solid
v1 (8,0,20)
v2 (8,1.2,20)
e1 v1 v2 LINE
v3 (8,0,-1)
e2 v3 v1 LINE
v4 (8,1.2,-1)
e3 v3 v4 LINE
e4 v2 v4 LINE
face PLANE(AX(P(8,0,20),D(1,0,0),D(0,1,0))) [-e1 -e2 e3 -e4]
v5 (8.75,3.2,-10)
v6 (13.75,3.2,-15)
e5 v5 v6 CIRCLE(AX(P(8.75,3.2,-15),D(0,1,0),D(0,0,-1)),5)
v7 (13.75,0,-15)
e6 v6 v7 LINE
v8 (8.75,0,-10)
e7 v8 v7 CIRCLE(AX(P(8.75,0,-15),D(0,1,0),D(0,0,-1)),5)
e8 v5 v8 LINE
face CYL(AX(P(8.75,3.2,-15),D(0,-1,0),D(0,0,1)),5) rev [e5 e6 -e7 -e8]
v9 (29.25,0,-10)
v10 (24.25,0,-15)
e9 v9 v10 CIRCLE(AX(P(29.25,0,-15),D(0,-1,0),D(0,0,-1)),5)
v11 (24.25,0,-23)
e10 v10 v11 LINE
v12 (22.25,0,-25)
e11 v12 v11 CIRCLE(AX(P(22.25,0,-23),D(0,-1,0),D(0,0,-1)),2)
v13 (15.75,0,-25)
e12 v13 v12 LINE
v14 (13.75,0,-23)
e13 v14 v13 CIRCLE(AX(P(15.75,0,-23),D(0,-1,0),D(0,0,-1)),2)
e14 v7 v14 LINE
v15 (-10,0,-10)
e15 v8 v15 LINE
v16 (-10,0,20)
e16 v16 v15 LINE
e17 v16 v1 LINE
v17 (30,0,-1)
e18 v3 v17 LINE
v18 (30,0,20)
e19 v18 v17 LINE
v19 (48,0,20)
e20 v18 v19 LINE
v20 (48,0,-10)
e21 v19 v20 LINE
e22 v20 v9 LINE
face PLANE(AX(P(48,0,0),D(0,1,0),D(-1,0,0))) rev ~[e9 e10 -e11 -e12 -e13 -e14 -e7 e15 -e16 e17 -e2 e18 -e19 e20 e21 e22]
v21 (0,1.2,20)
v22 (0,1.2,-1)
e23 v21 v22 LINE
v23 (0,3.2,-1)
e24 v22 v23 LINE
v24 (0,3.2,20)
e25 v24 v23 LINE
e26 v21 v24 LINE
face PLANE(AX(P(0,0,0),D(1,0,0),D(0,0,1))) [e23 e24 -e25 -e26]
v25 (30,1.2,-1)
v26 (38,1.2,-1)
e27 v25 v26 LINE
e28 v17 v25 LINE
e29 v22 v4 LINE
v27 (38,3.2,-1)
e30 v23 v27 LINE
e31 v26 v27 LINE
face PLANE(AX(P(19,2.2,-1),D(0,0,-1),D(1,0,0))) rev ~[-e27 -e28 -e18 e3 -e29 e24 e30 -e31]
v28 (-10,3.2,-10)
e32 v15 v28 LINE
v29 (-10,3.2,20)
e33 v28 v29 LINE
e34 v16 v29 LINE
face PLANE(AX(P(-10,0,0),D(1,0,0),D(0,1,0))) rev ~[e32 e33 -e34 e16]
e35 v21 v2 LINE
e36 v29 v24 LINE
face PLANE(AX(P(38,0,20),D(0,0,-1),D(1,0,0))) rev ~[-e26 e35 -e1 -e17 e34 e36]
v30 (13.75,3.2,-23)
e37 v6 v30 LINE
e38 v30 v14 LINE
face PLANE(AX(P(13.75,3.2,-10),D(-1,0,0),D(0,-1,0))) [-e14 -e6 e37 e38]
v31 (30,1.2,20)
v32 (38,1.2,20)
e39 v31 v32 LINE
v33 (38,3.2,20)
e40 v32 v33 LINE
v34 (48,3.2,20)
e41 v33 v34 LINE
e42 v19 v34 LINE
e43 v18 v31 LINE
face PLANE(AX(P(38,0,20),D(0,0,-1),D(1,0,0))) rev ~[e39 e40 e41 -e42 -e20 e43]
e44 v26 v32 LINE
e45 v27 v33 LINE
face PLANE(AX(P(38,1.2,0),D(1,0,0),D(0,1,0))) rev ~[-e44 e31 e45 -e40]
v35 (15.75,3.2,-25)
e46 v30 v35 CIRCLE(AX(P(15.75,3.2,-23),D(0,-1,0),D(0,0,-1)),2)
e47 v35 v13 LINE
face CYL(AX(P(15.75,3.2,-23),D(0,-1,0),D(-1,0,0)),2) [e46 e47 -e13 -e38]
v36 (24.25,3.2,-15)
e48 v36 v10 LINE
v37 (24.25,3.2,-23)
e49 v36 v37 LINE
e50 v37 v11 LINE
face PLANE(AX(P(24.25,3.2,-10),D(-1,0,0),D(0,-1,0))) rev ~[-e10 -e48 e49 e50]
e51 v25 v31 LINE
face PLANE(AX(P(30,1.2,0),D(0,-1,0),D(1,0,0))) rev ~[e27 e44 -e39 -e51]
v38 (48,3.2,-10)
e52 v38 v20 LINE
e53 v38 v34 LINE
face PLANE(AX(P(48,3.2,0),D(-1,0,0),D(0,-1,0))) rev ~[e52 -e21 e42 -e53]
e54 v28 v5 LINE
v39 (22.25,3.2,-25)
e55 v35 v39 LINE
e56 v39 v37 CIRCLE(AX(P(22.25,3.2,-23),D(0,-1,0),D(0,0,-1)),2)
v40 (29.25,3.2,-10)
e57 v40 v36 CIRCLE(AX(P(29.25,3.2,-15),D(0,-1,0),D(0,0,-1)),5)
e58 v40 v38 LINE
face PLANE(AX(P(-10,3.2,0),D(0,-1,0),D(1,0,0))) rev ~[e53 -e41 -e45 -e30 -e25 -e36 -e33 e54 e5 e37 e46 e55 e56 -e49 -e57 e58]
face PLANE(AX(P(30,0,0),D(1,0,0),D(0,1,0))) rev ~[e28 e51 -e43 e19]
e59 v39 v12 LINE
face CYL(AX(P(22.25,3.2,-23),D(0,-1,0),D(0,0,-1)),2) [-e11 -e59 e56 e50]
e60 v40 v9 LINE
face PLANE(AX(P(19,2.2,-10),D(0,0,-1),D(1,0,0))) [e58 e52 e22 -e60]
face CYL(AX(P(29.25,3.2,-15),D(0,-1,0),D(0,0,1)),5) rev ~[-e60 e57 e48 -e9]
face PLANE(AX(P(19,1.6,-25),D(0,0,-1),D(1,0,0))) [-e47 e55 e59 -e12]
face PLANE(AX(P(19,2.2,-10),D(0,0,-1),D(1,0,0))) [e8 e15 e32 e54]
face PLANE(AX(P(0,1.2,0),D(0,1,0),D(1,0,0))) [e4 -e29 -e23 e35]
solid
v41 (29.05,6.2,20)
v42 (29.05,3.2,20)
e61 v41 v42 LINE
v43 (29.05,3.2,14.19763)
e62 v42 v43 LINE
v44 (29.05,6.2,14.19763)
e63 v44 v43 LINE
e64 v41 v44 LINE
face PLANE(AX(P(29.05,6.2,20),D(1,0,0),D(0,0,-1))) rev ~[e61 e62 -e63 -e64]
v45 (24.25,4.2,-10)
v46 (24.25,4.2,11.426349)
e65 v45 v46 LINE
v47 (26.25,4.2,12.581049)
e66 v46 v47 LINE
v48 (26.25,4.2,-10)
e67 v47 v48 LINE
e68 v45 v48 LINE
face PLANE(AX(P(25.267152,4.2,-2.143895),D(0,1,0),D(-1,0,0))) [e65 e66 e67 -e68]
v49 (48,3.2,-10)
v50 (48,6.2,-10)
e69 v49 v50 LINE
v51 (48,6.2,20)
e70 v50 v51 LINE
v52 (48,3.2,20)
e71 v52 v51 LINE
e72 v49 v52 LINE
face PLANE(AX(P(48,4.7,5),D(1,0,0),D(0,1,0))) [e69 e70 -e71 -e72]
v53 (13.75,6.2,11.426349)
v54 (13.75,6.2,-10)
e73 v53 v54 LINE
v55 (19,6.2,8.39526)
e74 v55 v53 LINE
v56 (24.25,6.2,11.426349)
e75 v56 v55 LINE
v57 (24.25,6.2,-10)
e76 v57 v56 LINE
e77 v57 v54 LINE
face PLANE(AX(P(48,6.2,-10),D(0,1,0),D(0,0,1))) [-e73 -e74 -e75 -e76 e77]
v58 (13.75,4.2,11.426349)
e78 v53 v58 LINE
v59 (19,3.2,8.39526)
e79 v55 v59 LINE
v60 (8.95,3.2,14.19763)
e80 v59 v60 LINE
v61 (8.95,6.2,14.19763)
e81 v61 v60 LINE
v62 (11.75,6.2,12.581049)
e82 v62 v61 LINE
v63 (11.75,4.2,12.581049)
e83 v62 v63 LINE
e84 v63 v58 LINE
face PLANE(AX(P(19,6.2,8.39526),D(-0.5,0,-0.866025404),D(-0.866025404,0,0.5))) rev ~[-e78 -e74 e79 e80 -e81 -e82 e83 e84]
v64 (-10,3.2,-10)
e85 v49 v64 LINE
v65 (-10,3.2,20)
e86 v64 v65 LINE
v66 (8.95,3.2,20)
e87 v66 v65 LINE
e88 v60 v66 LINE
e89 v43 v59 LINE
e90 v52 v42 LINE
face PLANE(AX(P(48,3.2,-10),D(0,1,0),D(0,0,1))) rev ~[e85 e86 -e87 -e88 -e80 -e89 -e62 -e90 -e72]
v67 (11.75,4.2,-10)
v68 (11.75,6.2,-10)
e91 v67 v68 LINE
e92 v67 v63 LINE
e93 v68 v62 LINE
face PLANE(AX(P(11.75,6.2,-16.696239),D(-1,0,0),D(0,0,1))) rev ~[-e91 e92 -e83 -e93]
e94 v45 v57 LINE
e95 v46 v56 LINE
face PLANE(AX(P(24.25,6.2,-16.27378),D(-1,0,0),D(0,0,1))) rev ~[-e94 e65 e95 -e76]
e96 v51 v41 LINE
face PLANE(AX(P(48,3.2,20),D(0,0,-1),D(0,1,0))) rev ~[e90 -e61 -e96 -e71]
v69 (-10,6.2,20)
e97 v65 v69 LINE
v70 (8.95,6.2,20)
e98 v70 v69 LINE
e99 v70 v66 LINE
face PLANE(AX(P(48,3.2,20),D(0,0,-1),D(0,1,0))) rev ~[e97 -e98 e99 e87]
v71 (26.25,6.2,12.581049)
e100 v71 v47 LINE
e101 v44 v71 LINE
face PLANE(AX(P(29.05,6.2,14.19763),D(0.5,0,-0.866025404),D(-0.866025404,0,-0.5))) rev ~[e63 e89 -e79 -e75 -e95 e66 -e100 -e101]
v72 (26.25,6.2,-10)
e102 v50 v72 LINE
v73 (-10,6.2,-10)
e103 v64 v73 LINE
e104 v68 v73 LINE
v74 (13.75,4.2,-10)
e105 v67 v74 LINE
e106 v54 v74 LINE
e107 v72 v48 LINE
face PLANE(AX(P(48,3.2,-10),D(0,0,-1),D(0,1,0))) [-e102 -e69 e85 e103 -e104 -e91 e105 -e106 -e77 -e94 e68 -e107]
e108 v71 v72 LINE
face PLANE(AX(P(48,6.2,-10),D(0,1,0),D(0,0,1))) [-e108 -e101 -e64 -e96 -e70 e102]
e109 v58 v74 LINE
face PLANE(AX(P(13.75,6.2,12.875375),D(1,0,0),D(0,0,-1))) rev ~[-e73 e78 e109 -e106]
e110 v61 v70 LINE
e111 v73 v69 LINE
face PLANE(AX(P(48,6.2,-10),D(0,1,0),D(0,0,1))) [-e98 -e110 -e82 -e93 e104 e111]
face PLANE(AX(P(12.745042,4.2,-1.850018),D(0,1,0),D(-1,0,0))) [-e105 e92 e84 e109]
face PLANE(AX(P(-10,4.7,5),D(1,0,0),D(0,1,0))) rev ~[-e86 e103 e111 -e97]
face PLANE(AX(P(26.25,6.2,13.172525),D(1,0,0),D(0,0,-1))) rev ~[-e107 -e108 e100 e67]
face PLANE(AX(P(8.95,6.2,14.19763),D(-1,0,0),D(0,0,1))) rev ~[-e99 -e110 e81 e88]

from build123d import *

# Parameters (mm, degrees)
F0_W      = 38
F0_H      = 1.2
F1_DEPTH  = 20
F3_W      = 10
F3_H      = 20
F4_DEPTH  = 3.2
F5_W      = 10
F5_H      = 20
F6_DEPTH  = 3.2
F7_W      = 38
F7_H      = 2
F8_DEPTH  = 10
F2_W      = 22
F2_H      = 1.2
F9_DEPTH  = 20
F10_W     = 3
F10_H     = 30
F11_DEPTH = 58
F13_DEPTH = 6.201
F15_DEPTH = 2
F16_W     = 10.5
F16_H     = 3.2
F17_DEPTH = 15
F18_R     = 5
F19_R     = 2
F20_DEPTH = 1


with BuildPart() as f1:
    # F0 (on Top) → F1 (new body)
    with BuildSketch(Plane.XY):
        with Locations((19, 0.6)):
            Rectangle(F0_W, F0_H)
    extrude(amount=F1_DEPTH)

    # F3 (on face) → F4 (join)
    with BuildSketch(Plane.XZ):
        with Locations((-5, 10)):
            Rectangle(F3_W, F3_H)
    extrude(amount=-F4_DEPTH)

    # F5 (on face) → F6 (join)
    with BuildSketch(Plane.XZ):
        with Locations((43, 10)):
            Rectangle(F5_W, F5_H)
    extrude(amount=-F6_DEPTH)

    # F7 (on face) → F8 (join)
    with BuildSketch(Plane(origin=(0, 0, 0), x_dir=(1, 0, 0), z_dir=(0, 0, -1))):
        with Locations((19, -2.2)):
            Rectangle(F7_W, F7_H)
        Polygon((48, -3.2), (48, 0), (-10, 0), (-10, -3.2), (0, -3.2), (0, -1.2), (38, -1.2), (38, -3.2), align=None)
    extrude(amount=F8_DEPTH)

    # F2 (on face) → F9 (cut)
    with BuildSketch(Plane.XY.offset(20)):
        with Locations((19, 0.6)):
            Rectangle(F2_W, F2_H)
    extrude(amount=-F9_DEPTH, mode=Mode.SUBTRACT)

    # F16 (on face) → F17 (join)
    with BuildSketch(Plane(origin=(0, 0, -10), x_dir=(1, 0, 0), z_dir=(0, 0, -1))):
        with Locations((19, -1.6)):
            Rectangle(F16_W, F16_H)
    extrude(amount=F17_DEPTH)

    # F18
    f18_edges = [f1.edges().sort_by_distance(p)[0] for p in [
        (24.25, 1.6, -10),
        (13.75, 1.6, -10),
    ]]
    fillet(f18_edges, radius=F18_R)

    # F19
    f19_edges = [f1.edges().sort_by_distance(p)[0] for p in [
        (24.25, 1.6, -25),
        (13.75, 1.6, -25),
    ]]
    fillet(f19_edges, radius=F19_R)

    # F20 (cut): a face of the model
    f20_faces = [f1.faces().sort_by_distance(p)[0] for p in [
        (19, 1.7875, 0),
    ]]
    extrude(f20_faces, amount=-F20_DEPTH, mode=Mode.SUBTRACT)


with BuildPart() as f11:
    # F10 (on face) → F11 (new body)
    with BuildSketch(Plane.YZ.offset(48)):
        with Locations((4.7, 5)):
            Rectangle(F10_W, F10_H)
    extrude(amount=-F11_DEPTH)

    # F12 (on face) → F13 (cut, through all)
    with BuildSketch(Plane(origin=(0, 6.2, 0), x_dir=(-1, 0, 0), z_dir=(0, 1, 0))):
        Polygon((-29.05, 20), (-29.05, 14.1976297946), (-19, 8.3952595893), (-8.95, 14.1976297946), (-8.95, 20), align=None)
    extrude(amount=-F13_DEPTH, mode=Mode.SUBTRACT)

    # F14 (on face) → F15 (cut)
    with BuildSketch(Plane(origin=(0, 6.2, 0), x_dir=(-1, 0, 0), z_dir=(0, 1, 0))):
        Polygon((-24.25, 11.1954083949), (-26.25, 12.3501089332), (-26.25, -16.1530785263), (-24.25, -16.2737797946), align=None)
        Polygon((-26.25, 13.1725249812), (-26.25, 12.3501089332), (-24.25, 11.1954083949), (-24.25, 13.1725249812), align=None)
        Polygon((-11.75, -16.6962388903), (-11.75, 12.3501089332), (-11.75, 12.5810490409), (-13.75, 12.8753753379), (-13.75, 11.1954083949), (-13.75, -16.0927250981), align=None)
    extrude(amount=-F15_DEPTH, mode=Mode.SUBTRACT)


solid = Compound([f1.part, f11.part])
